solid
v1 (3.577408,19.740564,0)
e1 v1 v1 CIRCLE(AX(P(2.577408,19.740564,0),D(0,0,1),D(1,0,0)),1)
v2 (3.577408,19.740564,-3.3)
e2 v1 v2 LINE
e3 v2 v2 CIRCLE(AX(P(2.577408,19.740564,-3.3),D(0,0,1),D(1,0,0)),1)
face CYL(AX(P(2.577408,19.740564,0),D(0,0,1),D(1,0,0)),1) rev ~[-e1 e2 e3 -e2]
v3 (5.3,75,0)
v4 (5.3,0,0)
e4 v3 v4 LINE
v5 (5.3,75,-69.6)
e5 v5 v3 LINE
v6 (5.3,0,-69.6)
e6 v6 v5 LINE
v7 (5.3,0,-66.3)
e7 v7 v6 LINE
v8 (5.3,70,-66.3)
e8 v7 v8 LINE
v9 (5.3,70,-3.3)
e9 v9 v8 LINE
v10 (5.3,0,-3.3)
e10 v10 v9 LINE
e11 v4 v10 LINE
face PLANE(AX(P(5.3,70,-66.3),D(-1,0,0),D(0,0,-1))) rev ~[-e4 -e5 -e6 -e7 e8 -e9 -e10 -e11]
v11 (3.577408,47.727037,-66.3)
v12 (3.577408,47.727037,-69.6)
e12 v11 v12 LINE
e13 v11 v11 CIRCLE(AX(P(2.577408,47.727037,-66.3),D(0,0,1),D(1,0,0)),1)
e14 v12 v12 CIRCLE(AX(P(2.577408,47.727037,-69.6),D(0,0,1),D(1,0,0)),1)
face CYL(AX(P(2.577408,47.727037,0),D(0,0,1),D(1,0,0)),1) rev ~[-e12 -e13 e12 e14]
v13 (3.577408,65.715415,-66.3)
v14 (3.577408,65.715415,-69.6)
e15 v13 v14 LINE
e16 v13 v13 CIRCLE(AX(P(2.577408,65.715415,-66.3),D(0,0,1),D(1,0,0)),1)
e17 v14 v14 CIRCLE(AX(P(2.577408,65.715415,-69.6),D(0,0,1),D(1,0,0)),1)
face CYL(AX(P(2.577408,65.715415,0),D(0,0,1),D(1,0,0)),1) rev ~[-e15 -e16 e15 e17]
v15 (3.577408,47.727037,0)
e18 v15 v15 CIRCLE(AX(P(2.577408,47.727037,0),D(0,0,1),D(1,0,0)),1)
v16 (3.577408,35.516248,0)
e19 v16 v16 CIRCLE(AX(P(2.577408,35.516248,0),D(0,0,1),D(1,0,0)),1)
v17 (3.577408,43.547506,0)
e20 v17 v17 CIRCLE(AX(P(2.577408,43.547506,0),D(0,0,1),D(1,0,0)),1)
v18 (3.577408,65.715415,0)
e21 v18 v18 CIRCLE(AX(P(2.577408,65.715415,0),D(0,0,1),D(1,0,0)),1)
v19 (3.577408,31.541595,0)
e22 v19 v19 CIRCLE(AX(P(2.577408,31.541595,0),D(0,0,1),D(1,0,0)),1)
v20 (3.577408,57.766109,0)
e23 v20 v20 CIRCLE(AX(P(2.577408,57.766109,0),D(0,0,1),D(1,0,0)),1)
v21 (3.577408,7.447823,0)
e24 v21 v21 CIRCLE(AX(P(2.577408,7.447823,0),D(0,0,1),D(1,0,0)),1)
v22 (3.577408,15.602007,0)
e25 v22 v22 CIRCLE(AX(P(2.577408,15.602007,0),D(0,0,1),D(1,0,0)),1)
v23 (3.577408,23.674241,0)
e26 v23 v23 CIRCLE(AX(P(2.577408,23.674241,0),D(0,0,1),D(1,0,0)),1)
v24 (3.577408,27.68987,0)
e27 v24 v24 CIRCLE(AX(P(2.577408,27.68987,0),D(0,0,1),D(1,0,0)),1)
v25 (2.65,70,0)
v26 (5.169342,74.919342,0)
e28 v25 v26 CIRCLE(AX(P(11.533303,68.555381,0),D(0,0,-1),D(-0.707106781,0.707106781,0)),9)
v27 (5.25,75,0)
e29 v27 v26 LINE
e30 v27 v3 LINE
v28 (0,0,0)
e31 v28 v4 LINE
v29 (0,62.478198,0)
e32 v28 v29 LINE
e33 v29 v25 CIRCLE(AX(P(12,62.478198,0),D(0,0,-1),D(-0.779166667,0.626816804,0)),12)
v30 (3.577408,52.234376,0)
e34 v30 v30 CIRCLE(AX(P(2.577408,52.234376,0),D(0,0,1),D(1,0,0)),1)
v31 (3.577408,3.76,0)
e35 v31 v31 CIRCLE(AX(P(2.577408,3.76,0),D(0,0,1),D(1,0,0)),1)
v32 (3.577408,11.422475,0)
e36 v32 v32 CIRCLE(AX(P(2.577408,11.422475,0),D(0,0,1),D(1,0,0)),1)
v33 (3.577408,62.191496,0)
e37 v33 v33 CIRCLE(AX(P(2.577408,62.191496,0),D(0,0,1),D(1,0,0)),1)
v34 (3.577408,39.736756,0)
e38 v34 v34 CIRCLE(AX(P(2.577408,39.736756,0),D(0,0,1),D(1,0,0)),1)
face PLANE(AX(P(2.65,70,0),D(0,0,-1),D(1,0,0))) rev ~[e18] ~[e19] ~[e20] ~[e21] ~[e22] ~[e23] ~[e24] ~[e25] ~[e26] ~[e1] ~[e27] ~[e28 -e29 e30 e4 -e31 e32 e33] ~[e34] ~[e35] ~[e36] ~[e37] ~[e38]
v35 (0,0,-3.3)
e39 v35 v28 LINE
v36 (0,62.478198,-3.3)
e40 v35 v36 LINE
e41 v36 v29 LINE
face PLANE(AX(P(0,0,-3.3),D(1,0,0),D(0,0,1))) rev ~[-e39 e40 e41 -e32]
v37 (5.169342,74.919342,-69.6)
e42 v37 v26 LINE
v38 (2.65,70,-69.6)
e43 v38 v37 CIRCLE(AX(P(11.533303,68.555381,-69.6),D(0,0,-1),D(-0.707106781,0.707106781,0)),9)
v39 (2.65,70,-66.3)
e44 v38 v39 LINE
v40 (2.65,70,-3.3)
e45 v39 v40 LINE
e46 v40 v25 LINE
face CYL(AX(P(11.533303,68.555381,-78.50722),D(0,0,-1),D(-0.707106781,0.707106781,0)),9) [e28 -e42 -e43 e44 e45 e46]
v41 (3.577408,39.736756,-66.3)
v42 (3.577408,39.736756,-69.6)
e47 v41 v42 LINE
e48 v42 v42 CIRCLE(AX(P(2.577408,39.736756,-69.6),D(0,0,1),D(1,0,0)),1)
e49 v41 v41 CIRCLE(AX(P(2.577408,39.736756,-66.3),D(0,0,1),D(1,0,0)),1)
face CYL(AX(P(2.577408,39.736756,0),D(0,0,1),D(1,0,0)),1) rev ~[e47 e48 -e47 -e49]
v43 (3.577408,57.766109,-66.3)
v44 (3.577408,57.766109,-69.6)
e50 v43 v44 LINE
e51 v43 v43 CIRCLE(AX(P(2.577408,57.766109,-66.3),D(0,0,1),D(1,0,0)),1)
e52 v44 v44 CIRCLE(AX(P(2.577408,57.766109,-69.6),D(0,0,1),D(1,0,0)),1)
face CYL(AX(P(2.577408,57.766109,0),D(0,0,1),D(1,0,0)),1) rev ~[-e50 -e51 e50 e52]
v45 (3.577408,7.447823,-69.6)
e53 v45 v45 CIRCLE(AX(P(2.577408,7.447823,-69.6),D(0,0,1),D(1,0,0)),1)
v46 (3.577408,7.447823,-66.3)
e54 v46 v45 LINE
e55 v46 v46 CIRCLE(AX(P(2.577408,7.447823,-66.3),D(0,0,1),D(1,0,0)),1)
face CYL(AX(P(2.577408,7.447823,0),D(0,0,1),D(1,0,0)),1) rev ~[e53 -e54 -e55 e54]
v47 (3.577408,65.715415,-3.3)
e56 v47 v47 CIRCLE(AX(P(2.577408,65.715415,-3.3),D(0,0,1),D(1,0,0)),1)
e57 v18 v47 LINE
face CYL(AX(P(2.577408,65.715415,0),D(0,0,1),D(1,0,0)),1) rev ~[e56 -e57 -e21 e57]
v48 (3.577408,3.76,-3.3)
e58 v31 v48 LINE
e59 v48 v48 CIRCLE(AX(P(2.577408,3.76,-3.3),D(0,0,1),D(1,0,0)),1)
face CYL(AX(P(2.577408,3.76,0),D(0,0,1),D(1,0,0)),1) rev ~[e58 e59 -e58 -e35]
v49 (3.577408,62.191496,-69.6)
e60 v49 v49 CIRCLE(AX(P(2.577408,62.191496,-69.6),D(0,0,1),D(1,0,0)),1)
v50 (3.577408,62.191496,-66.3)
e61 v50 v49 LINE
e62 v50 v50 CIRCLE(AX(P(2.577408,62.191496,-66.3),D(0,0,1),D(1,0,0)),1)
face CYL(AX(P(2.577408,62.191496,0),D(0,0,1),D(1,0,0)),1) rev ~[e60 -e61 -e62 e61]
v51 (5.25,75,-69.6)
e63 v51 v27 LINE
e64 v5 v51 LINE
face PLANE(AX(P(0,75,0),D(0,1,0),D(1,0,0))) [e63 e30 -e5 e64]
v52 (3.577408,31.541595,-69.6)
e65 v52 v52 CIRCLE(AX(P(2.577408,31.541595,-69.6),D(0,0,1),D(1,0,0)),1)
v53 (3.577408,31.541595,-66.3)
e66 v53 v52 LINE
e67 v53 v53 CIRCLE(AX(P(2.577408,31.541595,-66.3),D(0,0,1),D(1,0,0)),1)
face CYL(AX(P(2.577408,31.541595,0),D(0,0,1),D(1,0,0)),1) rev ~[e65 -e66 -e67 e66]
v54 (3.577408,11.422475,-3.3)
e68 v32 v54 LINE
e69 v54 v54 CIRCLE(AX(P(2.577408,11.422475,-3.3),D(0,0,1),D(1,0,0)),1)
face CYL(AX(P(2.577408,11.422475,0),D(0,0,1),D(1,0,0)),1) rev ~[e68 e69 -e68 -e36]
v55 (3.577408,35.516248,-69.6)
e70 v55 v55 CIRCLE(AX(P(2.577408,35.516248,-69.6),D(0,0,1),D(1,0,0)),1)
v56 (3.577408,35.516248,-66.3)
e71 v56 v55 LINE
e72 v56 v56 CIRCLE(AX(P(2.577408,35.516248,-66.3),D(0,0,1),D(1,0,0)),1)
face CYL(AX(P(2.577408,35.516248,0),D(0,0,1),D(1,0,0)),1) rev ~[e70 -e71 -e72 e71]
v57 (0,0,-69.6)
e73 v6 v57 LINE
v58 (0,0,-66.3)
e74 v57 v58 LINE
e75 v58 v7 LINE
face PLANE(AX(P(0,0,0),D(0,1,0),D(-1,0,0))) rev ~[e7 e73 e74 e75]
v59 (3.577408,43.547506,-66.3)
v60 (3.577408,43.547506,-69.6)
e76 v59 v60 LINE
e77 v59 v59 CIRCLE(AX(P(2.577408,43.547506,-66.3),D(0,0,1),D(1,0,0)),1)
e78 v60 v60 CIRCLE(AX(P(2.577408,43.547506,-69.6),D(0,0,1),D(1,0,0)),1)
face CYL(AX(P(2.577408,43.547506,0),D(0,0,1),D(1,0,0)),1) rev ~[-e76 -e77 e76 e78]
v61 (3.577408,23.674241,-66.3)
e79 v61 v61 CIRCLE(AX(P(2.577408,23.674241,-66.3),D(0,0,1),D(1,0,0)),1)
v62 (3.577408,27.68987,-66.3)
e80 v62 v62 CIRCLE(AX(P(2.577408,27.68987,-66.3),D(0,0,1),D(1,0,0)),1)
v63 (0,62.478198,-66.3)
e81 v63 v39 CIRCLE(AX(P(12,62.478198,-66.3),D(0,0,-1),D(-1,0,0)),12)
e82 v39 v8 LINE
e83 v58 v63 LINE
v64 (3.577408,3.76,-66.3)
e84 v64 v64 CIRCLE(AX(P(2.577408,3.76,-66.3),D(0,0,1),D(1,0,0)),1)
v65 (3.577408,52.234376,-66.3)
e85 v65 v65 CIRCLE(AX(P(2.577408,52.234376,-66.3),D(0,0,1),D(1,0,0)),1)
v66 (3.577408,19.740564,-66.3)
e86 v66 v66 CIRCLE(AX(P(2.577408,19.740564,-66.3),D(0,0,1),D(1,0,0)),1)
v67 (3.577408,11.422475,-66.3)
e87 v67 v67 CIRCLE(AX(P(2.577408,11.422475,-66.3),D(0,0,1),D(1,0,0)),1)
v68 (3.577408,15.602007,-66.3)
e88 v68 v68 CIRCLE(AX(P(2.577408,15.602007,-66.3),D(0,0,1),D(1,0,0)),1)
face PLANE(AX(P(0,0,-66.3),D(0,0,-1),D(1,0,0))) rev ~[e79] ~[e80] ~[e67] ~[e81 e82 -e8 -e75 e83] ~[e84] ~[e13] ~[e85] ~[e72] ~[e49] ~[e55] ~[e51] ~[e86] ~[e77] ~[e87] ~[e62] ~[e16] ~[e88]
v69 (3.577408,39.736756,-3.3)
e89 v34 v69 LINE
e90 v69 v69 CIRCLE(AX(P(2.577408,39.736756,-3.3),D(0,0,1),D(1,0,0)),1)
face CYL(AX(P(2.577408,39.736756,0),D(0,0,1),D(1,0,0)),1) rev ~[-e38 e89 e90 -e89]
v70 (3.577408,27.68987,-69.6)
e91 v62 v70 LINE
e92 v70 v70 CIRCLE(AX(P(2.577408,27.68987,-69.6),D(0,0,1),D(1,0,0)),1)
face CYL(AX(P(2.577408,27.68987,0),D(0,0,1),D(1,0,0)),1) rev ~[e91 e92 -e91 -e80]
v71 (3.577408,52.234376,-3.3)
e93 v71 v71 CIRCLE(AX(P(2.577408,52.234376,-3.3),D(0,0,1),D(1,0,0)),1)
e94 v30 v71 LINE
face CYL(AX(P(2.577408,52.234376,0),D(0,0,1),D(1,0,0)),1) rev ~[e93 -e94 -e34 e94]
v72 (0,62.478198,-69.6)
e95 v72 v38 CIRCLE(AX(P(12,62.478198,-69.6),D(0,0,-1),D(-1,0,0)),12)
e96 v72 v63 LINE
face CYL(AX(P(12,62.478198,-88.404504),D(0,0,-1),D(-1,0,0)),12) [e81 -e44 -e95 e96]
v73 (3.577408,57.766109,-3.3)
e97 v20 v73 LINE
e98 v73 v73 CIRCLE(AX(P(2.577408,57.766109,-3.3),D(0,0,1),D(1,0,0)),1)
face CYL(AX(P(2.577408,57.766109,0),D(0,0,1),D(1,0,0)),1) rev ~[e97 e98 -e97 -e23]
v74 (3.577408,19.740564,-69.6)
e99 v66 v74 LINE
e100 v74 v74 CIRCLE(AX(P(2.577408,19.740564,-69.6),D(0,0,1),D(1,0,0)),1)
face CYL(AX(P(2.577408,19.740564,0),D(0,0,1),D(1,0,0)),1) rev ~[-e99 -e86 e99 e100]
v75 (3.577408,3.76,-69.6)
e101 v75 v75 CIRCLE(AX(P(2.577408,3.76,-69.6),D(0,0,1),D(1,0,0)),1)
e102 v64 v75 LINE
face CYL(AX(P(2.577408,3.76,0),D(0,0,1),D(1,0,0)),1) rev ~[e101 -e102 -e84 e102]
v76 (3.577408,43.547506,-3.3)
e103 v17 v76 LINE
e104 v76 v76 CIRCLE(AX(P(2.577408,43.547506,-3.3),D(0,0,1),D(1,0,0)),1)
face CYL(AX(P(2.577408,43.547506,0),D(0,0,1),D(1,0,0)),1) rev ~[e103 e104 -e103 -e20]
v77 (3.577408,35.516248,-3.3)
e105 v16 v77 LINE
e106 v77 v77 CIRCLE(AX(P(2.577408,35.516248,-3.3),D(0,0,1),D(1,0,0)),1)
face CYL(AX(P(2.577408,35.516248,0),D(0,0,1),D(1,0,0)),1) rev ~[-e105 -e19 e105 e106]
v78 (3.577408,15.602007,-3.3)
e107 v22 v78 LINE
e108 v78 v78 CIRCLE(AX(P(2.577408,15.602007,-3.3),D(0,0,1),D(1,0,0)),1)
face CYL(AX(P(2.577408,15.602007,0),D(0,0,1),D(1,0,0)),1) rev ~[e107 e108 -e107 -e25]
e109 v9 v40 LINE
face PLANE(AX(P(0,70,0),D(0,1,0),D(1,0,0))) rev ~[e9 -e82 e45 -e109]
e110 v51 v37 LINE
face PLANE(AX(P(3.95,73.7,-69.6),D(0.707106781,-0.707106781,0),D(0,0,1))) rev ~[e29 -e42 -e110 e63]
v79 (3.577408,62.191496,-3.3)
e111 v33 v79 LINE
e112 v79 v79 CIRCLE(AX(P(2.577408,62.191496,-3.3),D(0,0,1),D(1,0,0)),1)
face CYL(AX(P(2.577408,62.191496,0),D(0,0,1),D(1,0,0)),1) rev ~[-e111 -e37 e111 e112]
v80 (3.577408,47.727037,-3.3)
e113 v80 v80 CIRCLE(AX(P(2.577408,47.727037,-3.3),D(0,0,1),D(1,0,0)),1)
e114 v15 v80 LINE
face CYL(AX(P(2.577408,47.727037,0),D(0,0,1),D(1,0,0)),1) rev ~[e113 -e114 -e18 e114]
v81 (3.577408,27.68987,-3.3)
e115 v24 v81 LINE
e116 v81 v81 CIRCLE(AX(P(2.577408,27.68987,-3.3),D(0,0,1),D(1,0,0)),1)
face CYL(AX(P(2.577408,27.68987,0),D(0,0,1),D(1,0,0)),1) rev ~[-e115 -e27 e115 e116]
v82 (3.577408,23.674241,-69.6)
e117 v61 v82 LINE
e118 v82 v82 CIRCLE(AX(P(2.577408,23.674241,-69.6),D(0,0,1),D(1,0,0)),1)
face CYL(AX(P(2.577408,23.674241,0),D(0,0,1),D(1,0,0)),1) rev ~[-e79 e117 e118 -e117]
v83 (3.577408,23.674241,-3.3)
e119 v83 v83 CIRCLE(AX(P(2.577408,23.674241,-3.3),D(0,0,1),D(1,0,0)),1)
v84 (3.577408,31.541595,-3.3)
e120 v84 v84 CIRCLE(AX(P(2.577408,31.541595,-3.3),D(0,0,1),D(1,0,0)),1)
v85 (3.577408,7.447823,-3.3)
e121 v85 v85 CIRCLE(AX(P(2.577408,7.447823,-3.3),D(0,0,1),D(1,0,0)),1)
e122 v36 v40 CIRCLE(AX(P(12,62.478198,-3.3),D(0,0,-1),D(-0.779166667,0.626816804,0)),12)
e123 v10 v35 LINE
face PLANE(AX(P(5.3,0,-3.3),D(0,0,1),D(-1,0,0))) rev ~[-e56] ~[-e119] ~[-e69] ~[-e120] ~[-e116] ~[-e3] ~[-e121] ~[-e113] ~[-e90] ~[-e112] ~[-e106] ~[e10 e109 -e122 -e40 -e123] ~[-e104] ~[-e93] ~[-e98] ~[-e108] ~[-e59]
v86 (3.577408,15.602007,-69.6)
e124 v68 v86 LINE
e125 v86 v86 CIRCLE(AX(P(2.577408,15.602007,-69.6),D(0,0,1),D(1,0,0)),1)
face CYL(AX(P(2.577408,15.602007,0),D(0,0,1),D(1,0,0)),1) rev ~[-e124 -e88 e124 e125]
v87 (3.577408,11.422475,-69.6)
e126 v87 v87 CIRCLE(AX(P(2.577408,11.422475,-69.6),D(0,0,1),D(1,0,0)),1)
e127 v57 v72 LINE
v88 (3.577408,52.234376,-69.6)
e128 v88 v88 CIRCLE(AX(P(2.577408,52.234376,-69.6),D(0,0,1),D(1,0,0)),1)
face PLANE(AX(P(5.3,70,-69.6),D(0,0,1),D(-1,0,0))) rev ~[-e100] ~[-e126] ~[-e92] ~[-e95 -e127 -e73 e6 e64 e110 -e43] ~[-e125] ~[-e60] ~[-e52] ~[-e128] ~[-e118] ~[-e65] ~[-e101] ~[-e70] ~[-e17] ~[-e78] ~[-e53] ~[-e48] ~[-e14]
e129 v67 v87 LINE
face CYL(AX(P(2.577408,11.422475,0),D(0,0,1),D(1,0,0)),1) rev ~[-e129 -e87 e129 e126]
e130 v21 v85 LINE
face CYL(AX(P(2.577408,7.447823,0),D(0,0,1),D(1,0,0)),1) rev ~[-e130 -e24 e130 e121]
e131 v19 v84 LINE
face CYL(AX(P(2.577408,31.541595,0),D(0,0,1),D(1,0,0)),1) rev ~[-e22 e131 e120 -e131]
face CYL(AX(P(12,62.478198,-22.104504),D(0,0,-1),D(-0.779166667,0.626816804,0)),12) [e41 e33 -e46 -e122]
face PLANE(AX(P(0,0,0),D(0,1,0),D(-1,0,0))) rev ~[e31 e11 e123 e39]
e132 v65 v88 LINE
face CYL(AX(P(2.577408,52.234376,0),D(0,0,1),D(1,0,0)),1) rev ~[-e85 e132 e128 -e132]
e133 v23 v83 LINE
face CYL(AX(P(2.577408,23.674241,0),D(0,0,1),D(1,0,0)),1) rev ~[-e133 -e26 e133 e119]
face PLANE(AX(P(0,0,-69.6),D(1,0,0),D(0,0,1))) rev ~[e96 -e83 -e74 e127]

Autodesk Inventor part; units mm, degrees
ref_plane "YZ Plane" through (0, 0, 0) normal (1, 0, 0) x (0, 1, 0)
ref_plane "XZ Plane" through (0, 0, 0) normal (0, 1, 0) x (-1, 0, 0)
ref_plane "XY Plane" through (0, 0, 0) normal (0, 0, 1) x (1, 0, 0)
sketch "Sketch1" plane through (0, 0, 0) normal (0, 1, 0) x (-1, 0, 0)
  line L0 (0, 0) -> (-5.3, 0)
  line L1 (-5.3, 0) -> (-5.3, -3.3)
  line L2 (-5.3, -3.3) -> (0, -3.3)
  line L3 (0, -3.3) -> (0, 0)
  line L4 (0, -66.3) -> (-5.3, -66.3)
  line L5 (-5.3, -66.3) -> (-5.3, -69.6)
  line L6 (-5.3, -69.6) -> (0, -69.6)
  line L7 (0, -69.6) -> (0, -66.3)
  dimension "d0" = 5.3
  dimension "d1" = 3.3
  dimension "d2" = 63
  dimension "d3" = 5.3
  dimension "d4" = 3.3
sketch "Sketch1 outline for Rails" plane through (0, 0, 0) normal (0, 1, 0) x (-1, 0, 0)
  line L0 (0, -66.3) -> (-5.3, -66.3)
  line L1 (0, -69.6) -> (0, -66.3)
  line L2 (-5.3, -69.6) -> (0, -69.6)
  line L3 (-5.3, -66.3) -> (-5.3, -69.6)
  line L4 (0, 0) -> (-5.3, 0)
  line L5 (0, -3.3) -> (0, 0)
  line L6 (-5.3, -3.3) -> (0, -3.3)
  line L7 (-5.3, 0) -> (-5.3, -3.3)
extrude "Rails" add sketch "Sketch1 outline for Rails" along normal blind 70
sketch "Sketch2" plane through (0, 70, 0) normal (0, 1, 0) x (1, 0, 0)
  line L0 (0, 0) -> (5.3, 0) projected
  line L1 (5.3, 66.3) -> (5.3, 69.6) projected
  line L2 (2.65, 0) -> (5.3, 0)
  line L3 (5.3, 0) -> (5.3, 69.6)
  line L4 (5.3, 69.6) -> (2.65, 69.6)
  line L5 (2.65, 69.6) -> (2.65, 0)
sketch "Sketch2 outline for Extrusion2" plane through (0, 70, 0) normal (0, 1, 0) x (1, 0, 0)
  line L0 (5.3, 69.6) -> (2.65, 69.6)
  line L1 (5.3, 66.3) -> (5.3, 69.6)
  line L2 (5.3, 0) -> (5.3, 66.3)
  line L3 (2.65, 0) -> (5.3, 0)
  line L4 (2.65, 69.6) -> (2.65, 0)
extrude "Extrusion2" add sketch "Sketch2 outline for Extrusion2" along normal blind 5
chamfer "Chamfer1" distance 2.6 angle 45 1 edges at (2.65, 75, -34.8)
fillet "Scoop lip" radius 9 1 edges at (2.65, 72.4, -34.8)
fillet "Purely Aesthetics" radius 12 2 edges at (0, 70, -1.65) (0, 70, -67.95)
sketch "Sketch4" plane through (0, 0, 0) normal (0, 0, 1) x (1, 0, 0)
  circle A0 centre (2.577408, 3.76) radius 1
  circle A1 centre (2.577408, 7.447823) radius 1
  circle A2 centre (2.577408, 11.422475) radius 1
  circle A3 centre (2.577408, 15.602007) radius 1
  circle A4 centre (2.577408, 19.740564) radius 1
  circle A5 centre (2.577408, 23.674241) radius 1
  circle A6 centre (2.577408, 27.68987) radius 1
  circle A7 centre (2.577408, 31.541595) radius 1
  circle A8 centre (2.577408, 35.516248) radius 1
  circle A9 centre (2.577408, 39.736756) radius 1
  circle A10 centre (2.577408, 43.547506) radius 1
  circle A11 centre (2.577408, 47.727037) radius 1
  circle A12 centre (2.577408, 52.234376) radius 1
  circle A13 centre (2.577408, 57.766109) radius 1
  circle A14 centre (2.577408, 62.191496) radius 1
  circle A15 centre (2.577408, 65.715415) radius 1
  point P0 (0, 0)
  dimension "d14" = 2
  dimension "d15" = 2
  dimension "d16" = 2
  dimension "d17" = 2
  dimension "d18" = 2
  dimension "d19" = 2
  dimension "d20" = 2
  dimension "d21" = 2
  dimension "d22" = 2
  dimension "d23" = 2
  dimension "d24" = 2
  dimension "d25" = 2
  dimension "d26" = 2
  dimension "d27" = 2
  dimension "d28" = 2
  dimension "d29" = 2
sketch "Sketch4 outline for Mesh Mounting Holes" plane through (0, 0, 0) normal (0, 0, 1) x (1, 0, 0)
  circle A0 centre (2.577408, 65.715415) radius 1
  circle A1 centre (2.577408, 62.191496) radius 1
  circle A2 centre (2.577408, 57.766109) radius 1
  circle A3 centre (2.577408, 52.234376) radius 1
  circle A4 centre (2.577408, 47.727037) radius 1
  circle A5 centre (2.577408, 43.547506) radius 1
  circle A6 centre (2.577408, 39.736756) radius 1
  circle A7 centre (2.577408, 35.516248) radius 1
  circle A8 centre (2.577408, 31.541595) radius 1
  circle A9 centre (2.577408, 27.68987) radius 1
  circle A10 centre (2.577408, 23.674241) radius 1
  circle A11 centre (2.577408, 19.740564) radius 1
  circle A12 centre (2.577408, 15.602007) radius 1
  circle A13 centre (2.577408, 11.422475) radius 1
  circle A14 centre (2.577408, 7.447823) radius 1
  circle A15 centre (2.577408, 3.76) radius 1
extrude "Mesh Mounting Holes" cut sketch "Sketch4 outline for Mesh Mounting Holes" against normal blind 70
properties part number "rails+scoop"
